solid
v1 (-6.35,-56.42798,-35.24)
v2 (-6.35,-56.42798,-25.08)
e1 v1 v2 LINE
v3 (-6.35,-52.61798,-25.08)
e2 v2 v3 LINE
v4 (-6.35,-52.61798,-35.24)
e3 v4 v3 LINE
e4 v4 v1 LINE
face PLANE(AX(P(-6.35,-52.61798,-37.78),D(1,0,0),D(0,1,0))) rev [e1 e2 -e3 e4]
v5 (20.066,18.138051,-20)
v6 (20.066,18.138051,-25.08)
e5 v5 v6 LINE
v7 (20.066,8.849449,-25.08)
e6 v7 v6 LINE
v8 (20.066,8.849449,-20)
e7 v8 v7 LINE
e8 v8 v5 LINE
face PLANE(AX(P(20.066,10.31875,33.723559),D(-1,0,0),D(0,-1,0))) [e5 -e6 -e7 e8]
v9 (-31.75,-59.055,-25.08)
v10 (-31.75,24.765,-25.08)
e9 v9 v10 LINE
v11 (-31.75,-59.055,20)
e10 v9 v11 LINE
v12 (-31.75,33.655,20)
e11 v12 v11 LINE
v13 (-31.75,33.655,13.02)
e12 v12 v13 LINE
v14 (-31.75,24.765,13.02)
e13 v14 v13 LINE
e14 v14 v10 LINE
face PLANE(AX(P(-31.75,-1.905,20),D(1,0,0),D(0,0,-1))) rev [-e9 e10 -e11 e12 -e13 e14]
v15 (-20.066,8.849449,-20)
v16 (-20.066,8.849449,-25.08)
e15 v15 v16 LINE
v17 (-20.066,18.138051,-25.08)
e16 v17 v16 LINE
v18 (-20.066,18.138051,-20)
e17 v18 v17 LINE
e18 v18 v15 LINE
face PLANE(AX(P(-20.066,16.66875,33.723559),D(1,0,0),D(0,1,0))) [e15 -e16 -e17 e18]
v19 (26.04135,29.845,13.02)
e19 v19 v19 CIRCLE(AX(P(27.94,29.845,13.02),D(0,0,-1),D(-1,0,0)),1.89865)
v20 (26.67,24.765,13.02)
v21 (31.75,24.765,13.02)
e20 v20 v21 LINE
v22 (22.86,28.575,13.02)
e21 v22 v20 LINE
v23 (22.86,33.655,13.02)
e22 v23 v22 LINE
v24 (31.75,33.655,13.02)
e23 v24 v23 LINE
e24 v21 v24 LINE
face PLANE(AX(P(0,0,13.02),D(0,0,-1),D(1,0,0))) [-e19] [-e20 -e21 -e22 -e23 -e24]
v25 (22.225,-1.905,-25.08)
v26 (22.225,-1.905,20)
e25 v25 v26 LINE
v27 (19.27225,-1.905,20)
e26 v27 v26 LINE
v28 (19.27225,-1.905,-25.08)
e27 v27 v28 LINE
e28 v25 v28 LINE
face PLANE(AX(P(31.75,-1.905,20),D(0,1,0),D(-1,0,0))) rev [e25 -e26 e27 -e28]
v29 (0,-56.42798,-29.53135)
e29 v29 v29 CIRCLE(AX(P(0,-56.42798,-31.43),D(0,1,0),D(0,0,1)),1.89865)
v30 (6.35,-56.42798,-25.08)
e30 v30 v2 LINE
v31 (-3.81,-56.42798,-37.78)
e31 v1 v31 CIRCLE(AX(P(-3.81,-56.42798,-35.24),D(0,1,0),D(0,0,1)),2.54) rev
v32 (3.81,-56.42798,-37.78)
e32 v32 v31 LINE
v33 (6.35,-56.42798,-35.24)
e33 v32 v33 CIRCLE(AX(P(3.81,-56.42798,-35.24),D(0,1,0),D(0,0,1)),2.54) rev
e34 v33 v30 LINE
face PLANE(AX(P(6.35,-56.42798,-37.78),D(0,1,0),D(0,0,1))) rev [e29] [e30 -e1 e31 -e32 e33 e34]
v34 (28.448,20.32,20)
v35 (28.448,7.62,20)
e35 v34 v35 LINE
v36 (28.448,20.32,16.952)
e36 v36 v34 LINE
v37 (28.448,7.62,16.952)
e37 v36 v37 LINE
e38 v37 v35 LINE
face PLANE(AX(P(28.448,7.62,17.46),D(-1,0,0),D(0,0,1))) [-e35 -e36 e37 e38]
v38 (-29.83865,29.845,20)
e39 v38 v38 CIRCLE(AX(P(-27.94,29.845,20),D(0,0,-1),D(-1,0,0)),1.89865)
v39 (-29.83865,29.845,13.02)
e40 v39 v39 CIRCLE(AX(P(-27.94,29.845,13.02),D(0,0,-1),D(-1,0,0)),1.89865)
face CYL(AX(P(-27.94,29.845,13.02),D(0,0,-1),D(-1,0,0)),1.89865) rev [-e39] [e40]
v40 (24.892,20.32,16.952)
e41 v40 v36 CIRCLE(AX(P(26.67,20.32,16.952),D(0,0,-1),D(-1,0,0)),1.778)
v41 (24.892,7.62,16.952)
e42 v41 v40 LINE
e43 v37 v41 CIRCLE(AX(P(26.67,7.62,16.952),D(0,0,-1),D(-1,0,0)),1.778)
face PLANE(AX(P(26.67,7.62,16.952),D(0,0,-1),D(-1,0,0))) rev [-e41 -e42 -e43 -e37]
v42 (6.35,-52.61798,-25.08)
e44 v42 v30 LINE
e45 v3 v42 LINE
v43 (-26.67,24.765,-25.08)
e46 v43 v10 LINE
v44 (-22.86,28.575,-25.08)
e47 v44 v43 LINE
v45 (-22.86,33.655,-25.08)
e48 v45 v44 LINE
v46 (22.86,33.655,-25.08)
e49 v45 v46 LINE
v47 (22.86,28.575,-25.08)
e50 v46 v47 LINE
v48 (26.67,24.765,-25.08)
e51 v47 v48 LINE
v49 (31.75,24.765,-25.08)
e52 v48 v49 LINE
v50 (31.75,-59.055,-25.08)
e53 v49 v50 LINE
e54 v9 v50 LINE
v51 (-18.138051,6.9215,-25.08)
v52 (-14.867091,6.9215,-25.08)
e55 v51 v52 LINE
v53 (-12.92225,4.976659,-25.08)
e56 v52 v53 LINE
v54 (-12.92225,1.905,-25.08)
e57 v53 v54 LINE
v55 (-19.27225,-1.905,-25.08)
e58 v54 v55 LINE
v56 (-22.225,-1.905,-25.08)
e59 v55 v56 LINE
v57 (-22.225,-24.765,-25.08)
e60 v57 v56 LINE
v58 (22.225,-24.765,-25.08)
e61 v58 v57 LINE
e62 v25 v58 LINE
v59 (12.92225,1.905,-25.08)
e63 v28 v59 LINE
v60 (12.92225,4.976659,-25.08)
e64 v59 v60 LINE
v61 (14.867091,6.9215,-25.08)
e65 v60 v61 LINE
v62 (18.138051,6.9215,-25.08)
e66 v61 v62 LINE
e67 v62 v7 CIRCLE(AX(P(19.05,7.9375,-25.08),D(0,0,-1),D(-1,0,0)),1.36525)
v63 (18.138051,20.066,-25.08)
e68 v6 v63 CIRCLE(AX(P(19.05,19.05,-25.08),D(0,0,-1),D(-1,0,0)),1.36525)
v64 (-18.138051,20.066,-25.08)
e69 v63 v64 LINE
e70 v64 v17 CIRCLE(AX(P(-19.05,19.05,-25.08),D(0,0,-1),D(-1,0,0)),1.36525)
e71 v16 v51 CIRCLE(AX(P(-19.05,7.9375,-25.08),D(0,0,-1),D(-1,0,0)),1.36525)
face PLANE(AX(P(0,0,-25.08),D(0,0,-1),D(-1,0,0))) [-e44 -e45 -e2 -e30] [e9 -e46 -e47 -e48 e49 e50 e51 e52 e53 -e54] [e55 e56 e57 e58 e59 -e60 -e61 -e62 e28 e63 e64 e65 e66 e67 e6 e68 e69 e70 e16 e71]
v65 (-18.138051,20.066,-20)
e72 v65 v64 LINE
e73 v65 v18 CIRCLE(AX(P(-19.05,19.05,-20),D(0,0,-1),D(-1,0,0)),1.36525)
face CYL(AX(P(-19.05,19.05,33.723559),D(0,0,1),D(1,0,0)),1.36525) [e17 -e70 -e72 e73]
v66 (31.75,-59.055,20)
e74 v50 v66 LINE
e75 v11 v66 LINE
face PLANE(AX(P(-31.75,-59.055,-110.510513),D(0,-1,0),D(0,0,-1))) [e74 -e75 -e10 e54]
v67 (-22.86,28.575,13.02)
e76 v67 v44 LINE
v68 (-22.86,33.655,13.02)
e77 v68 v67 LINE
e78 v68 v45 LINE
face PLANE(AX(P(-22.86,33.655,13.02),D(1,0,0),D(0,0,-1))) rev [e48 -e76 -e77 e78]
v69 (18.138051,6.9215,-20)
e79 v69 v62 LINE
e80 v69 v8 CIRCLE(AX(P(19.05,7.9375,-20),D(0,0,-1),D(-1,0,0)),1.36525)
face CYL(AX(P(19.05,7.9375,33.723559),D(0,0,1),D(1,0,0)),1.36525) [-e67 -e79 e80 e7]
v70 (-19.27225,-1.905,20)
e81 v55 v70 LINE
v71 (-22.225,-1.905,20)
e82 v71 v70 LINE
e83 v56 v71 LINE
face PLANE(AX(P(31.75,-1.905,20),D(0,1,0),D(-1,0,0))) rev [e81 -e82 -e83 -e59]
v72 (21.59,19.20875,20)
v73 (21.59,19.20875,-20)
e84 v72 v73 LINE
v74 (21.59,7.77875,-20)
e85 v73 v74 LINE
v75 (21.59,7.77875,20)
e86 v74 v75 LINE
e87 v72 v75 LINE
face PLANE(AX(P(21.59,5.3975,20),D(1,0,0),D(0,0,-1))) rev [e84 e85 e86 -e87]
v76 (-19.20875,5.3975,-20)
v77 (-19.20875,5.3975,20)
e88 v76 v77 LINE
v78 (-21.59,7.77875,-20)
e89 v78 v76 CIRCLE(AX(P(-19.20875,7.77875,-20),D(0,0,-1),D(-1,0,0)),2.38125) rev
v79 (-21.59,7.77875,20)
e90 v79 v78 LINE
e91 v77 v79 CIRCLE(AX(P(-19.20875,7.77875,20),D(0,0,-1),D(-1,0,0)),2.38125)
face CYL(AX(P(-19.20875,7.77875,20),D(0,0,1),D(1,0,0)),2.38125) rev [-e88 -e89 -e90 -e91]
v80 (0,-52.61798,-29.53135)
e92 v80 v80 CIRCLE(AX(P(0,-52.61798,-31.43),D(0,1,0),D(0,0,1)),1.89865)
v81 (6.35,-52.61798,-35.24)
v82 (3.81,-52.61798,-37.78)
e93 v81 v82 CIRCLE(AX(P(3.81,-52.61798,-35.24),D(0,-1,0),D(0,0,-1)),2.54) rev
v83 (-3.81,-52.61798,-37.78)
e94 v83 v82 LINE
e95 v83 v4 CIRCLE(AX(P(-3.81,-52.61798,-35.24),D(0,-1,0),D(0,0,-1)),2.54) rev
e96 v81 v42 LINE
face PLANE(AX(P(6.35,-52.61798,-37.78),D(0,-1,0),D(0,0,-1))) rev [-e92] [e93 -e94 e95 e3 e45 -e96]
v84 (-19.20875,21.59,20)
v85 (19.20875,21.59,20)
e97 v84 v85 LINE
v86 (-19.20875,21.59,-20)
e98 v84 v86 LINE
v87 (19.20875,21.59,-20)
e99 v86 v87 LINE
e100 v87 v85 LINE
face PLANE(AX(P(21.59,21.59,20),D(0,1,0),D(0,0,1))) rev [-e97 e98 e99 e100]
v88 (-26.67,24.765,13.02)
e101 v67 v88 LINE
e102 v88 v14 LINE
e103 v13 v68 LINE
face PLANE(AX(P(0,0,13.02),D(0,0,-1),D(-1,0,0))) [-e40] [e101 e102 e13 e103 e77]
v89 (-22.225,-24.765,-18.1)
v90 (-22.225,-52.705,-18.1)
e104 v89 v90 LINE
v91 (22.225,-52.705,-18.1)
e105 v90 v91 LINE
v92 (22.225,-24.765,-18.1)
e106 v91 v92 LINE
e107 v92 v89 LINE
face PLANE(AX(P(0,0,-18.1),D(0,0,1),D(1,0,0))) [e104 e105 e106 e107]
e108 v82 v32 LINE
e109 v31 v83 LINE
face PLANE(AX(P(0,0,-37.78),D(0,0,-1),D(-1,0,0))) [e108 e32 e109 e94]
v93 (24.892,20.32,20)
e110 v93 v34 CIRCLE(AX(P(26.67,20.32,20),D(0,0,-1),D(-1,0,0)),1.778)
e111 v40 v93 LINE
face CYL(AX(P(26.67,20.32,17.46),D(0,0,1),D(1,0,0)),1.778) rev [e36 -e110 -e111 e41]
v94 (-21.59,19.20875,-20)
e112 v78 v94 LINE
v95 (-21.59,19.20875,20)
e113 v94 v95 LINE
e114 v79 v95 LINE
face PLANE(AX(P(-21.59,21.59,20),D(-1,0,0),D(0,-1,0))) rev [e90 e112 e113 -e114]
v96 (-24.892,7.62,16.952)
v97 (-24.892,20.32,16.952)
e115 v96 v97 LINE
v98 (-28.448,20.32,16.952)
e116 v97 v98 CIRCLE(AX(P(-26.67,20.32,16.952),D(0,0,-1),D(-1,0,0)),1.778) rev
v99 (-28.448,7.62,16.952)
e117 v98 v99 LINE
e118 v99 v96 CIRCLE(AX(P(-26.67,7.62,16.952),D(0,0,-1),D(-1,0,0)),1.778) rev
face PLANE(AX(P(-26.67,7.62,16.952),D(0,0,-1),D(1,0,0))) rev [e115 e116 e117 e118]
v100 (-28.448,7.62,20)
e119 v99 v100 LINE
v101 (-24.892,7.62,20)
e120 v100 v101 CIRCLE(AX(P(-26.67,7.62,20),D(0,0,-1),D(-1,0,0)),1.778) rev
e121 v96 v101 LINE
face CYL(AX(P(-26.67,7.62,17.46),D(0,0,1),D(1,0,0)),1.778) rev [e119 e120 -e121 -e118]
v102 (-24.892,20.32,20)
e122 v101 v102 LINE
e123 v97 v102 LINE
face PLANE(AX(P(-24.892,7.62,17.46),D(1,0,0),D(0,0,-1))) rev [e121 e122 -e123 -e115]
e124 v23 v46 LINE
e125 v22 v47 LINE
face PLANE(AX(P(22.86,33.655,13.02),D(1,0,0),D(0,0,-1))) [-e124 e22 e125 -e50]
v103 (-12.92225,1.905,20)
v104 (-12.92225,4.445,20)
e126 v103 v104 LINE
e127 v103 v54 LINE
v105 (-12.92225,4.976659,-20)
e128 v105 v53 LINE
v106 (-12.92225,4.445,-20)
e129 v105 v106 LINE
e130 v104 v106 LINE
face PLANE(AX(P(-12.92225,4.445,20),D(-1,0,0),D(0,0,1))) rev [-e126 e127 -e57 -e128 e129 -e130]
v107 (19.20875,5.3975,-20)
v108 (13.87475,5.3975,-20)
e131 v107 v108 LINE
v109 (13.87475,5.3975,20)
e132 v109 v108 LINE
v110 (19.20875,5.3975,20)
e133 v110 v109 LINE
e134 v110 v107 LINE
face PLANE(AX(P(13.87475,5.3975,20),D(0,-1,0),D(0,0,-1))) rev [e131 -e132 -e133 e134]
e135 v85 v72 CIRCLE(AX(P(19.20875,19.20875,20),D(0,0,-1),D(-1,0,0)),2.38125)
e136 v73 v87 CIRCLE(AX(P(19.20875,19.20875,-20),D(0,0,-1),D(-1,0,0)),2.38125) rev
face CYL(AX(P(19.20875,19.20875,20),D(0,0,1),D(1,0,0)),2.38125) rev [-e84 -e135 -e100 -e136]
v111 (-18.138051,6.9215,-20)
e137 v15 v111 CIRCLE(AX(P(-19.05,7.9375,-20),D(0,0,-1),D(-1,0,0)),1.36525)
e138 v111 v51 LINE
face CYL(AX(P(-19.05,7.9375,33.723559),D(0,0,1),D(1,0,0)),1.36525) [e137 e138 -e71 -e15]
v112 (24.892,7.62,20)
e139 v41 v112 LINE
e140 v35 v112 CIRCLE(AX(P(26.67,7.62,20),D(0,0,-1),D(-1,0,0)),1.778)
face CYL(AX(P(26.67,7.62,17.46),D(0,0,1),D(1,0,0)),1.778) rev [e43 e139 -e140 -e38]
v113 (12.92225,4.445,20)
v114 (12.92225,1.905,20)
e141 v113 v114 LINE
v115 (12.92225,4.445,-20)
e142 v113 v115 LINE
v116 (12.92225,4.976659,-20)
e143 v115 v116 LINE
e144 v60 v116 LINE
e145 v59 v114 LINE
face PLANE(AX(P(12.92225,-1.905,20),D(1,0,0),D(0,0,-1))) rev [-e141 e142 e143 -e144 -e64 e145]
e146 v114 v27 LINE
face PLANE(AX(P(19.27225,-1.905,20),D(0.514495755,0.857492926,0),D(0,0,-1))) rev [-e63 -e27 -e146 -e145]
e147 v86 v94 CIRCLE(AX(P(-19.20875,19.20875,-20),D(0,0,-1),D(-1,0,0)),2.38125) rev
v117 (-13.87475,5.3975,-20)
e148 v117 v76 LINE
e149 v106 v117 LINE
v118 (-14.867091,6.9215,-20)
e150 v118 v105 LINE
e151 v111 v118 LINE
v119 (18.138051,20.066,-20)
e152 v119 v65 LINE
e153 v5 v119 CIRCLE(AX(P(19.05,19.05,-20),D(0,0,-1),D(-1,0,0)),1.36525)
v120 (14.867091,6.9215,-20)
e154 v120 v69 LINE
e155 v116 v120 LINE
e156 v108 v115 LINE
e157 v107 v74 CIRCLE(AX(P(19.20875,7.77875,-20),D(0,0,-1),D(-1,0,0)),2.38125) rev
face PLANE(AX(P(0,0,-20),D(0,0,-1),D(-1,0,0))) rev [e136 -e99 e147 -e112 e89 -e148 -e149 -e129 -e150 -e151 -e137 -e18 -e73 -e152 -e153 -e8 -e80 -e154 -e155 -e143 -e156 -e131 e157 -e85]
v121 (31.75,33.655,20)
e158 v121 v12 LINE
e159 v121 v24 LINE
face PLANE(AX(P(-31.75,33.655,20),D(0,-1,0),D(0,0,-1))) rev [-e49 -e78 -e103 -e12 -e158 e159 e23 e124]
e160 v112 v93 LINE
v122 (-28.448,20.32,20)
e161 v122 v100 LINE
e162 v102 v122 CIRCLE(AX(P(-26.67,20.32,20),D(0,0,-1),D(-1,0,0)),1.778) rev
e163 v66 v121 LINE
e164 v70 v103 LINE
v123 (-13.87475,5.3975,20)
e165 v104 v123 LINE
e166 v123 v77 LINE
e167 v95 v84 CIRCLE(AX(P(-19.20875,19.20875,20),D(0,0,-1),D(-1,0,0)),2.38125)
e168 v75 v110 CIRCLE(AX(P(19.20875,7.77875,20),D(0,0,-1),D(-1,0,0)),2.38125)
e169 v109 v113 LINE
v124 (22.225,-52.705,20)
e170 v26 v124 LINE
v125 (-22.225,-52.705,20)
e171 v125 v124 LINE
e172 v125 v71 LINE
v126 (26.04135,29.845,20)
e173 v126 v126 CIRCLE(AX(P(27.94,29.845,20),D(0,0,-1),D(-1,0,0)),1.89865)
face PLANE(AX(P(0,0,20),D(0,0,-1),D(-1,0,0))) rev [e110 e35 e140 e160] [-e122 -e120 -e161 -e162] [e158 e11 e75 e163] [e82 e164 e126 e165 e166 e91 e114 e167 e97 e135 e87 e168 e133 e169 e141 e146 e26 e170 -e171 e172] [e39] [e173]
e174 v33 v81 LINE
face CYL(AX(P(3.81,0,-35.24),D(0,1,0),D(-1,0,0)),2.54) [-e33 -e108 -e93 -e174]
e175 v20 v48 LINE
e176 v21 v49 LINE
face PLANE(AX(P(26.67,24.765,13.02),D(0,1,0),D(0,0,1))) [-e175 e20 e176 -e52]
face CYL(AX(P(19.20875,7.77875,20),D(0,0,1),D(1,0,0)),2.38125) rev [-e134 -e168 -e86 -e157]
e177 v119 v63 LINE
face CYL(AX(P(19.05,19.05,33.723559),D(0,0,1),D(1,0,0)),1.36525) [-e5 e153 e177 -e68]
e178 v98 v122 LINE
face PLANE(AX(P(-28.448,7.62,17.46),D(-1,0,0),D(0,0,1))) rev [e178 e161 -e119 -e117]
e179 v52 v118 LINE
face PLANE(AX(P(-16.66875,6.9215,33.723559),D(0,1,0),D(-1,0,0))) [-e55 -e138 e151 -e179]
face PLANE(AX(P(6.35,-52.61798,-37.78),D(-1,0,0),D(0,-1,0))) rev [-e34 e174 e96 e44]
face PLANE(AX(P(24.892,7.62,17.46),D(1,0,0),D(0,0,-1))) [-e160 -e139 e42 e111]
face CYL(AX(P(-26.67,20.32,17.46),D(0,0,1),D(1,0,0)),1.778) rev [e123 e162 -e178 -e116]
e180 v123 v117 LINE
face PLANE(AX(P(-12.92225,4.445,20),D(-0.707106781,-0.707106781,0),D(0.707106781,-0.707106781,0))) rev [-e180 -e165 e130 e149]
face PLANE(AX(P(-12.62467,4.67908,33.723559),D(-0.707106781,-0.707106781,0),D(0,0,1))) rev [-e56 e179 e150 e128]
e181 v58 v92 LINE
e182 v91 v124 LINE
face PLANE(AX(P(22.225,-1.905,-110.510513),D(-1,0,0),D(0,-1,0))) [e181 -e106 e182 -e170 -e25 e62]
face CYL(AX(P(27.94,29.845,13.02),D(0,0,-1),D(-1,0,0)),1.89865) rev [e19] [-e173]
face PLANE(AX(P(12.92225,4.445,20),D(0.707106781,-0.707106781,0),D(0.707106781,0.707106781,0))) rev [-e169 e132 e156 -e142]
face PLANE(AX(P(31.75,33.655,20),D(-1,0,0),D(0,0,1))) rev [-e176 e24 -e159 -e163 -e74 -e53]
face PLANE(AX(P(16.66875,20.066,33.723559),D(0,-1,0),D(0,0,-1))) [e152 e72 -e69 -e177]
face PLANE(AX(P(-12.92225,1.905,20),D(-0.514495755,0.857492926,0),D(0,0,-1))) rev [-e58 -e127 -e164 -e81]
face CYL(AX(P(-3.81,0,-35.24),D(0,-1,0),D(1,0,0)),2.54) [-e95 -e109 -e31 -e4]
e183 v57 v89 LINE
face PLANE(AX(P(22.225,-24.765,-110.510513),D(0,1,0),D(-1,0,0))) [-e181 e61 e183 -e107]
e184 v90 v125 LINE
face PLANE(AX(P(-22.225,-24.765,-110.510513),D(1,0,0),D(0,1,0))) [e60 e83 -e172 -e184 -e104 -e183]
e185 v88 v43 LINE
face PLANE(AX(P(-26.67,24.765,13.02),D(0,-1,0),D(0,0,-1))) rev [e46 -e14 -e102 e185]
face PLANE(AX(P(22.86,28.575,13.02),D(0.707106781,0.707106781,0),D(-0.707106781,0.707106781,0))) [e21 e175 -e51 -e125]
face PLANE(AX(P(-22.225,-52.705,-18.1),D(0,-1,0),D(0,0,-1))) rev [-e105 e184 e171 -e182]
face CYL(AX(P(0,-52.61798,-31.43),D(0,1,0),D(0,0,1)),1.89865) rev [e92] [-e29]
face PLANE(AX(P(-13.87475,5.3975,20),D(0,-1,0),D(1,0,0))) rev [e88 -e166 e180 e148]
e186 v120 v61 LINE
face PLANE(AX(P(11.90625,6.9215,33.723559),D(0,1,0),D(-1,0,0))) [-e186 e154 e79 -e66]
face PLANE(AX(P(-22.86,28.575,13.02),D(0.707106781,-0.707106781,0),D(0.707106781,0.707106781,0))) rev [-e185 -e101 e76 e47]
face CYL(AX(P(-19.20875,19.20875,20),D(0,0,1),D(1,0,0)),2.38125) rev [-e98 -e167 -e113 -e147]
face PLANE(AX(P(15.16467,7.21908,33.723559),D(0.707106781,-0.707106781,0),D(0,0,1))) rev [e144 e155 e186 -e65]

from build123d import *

# Parameters (mm, degrees)
BOSS_EXTRU_1_DEPTH      = 20
CONG_1_R                = 2.38125
ESQUISSE2_W             = 63.5
ESQUISSE2_H             = 35.56
BOSS_EXTRU_2_DEPTH      = 5.08
EMPREINTE1_START        = -25.08
EMPREINTE1_DEPTH        = 5.08
D_PLACER_START          = -25.08
D_PLACER_LA_FACE1_DEPTH = 5.08
EMPREINTE4_START        = 17.46
EMPREINTE4_DEPTH        = 2.54
D_PLACER_START_2        = 16.952
D_PLACER_LA_FACE2_DEPTH = 3.048
CHANFREIN1_SIZE         = 6.35
CHANFREIN1_SIZE2        = 3.81
CHANFREIN2_SIZE         = 3.81
CHANFREIN2_SIZE2        = 6.35
BOSS_EXTRU_3_DEPTH      = 45.08
ESQUISSE4_W             = 44.45
ESQUISSE4_H             = 27.94
ENL_V_MAT_EXTRU_1_DEPTH = 38.1
ESQUISSE5_W             = 12.7
ESQUISSE5_H             = 3.81
BOSS_EXTRU_4_DEPTH      = 12.7
CONG_2_R                = 2.54
D_GAGEMENT_61_D         = 3.7973
ENL_V_MAT_EXTRU_2_DEPTH = 38.1
D_GAGEMENT_62_D         = 3.7973
D_GAGEMENT_62_DEPTH     = 18.796
D_GAGEMENT_62_TIP       = 1.140824014


# Read off the part's stored shape, not the designer's step: Empreinte1, Déplacer la face1, Empreinte4, Déplacer la face2
with BuildPart() as part:
    # Esquisse1 → Boss.-Extru.1 (new, symmetric)
    with BuildSketch(Plane.XY):
        Polygon((-31.75, -1.905), (-31.75, 33.655), (31.75, 33.655), (31.75, -1.905), (12.92225, -1.905), (12.92225, 4.445), (13.87475, 5.3975), (21.59, 5.3975), (21.59, 21.59), (-21.59, 21.59), (-21.59, 5.3975), (-13.87475, 5.3975), (-12.92225, 4.445), (-12.92225, -1.905), align=None)
    extrude(amount=BOSS_EXTRU_1_DEPTH, both=True)

    # Congé1
    cong_1_edges = [part.edges().sort_by_distance(p)[0] for p in [
        (21.59, 5.3975, 0),
        (21.59, 21.59, 0),
        (-21.59, 21.59, 0),
        (-21.59, 5.3975, 0),
    ]]
    fillet(cong_1_edges, radius=CONG_1_R)

    # Esquisse2 → Boss.-Extru.2 (add)
    with BuildSketch(Plane(origin=(0, 0, -20), x_dir=(-1, 0, 0), z_dir=(0, 0, -1))):
        with Locations((0, 15.875)):
            Rectangle(ESQUISSE2_W, ESQUISSE2_H)
    extrude(amount=BOSS_EXTRU_2_DEPTH)

    # Empreinte1 outline → Empreinte1 (cut)
    with BuildSketch(Plane.XY.offset(EMPREINTE1_START)):
        with BuildLine():
            Line((14.44625, 7.9375), (16.66875, 7.9375))
            ThreePointArc((16.66875, 7.9375), (17.366201977, 9.621298023), (19.05, 10.31875))
            Line((19.05, 10.31875), (19.05, 16.66875))
            ThreePointArc((19.05, 16.66875), (17.366201977, 17.366201977), (16.66875, 19.05))
            Line((16.66875, 19.05), (-16.66875, 19.05))
            ThreePointArc((-16.66875, 19.05), (-17.366201977, 17.366201977), (-19.05, 16.66875))
            Line((-19.05, 16.66875), (-19.05, 10.31875))
            ThreePointArc((-19.05, 10.31875), (-17.366201977, 9.621298023), (-16.66875, 7.9375))
            Line((-16.66875, 7.9375), (-14.44625, 7.9375))
            Line((-14.44625, 7.9375), (-11.90625, 5.3975))
            Line((-11.90625, 5.3975), (-11.90625, -1.905))
            Line((-11.90625, -1.905), (11.90625, -1.905))
            Line((11.90625, -1.905), (11.90625, 5.3975))
            Line((11.90625, 5.3975), (14.44625, 7.9375))
        make_face()
    extrude(amount=EMPREINTE1_DEPTH, mode=Mode.SUBTRACT)

    # Déplacer la face1 outline → Déplacer la face1 (cut)
    with BuildSketch(Plane.XY.offset(D_PLACER_START)):
        with BuildLine():
            Line((-14.867090979, 6.9215), (-12.92225, 4.976659021))
            Line((-12.92225, 4.976659021), (-12.92225, -1.905))
            Line((-12.92225, -1.905), (-11.90625, -1.905))
            Line((-11.90625, -1.905), (-11.90625, 5.3975))
            Line((-11.90625, 5.3975), (-14.44625, 7.9375))
            Line((-14.44625, 7.9375), (-16.66875, 7.9375))
            ThreePointArc((-16.66875, 7.9375), (-17.366201977, 9.621298023), (-19.05, 10.31875))
            Line((-19.05, 10.31875), (-19.05, 16.66875))
            ThreePointArc((-19.05, 16.66875), (-17.366201977, 17.366201977), (-16.66875, 19.05))
            Line((-16.66875, 19.05), (16.66875, 19.05))
            ThreePointArc((16.66875, 19.05), (17.366201977, 17.366201977), (19.05, 16.66875))
            Line((19.05, 16.66875), (19.05, 10.31875))
            ThreePointArc((19.05, 10.31875), (17.366201977, 9.621298023), (16.66875, 7.9375))
            Line((16.66875, 7.9375), (14.44625, 7.9375))
            Line((14.44625, 7.9375), (11.90625, 5.3975))
            Line((11.90625, 5.3975), (11.90625, -1.905))
            Line((11.90625, -1.905), (12.92225, -1.905))
            Line((12.92225, -1.905), (12.92225, 4.976659021))
            Line((12.92225, 4.976659021), (14.867090979, 6.9215))
            Line((14.867090979, 6.9215), (18.13805068, 6.9215))
            ThreePointArc((18.13805068, 6.9215), (18.084622467, 8.902877533), (20.066, 8.84944932))
            Line((20.066, 8.84944932), (20.066, 18.13805068))
            ThreePointArc((20.066, 18.13805068), (18.084622467, 18.084622467), (18.13805068, 20.066))
            Line((18.13805068, 20.066), (-18.13805068, 20.066))
            ThreePointArc((-18.13805068, 20.066), (-18.084622467, 18.084622467), (-20.066, 18.13805068))
            Line((-20.066, 18.13805068), (-20.066, 8.84944932))
            ThreePointArc((-20.066, 8.84944932), (-18.084622467, 8.902877533), (-18.13805068, 6.9215))
            Line((-18.13805068, 6.9215), (-14.867090979, 6.9215))
        make_face()
    extrude(amount=D_PLACER_LA_FACE1_DEPTH, mode=Mode.SUBTRACT)

    # Empreinte4 outline → Empreinte4 (cut)
    with BuildSketch(Plane.XY.offset(EMPREINTE4_START)):
        with BuildLine():
            ThreePointArc((-27.94, 7.62), (-26.67, 6.35), (-25.4, 7.62))
            Line((-25.4, 7.62), (-25.4, 20.32))
            ThreePointArc((-25.4, 20.32), (-26.67, 21.59), (-27.94, 20.32))
            Line((-27.94, 20.32), (-27.94, 7.62))
        make_face()
        with BuildLine():
            Line((25.4, 20.32), (25.4, 7.62))
            ThreePointArc((25.4, 7.62), (26.67, 6.35), (27.94, 7.62))
            Line((27.94, 7.62), (27.94, 20.32))
            ThreePointArc((27.94, 20.32), (26.67, 21.59), (25.4, 20.32))
        make_face()
    extrude(amount=EMPREINTE4_DEPTH, mode=Mode.SUBTRACT)

    # Déplacer la face2 outline → Déplacer la face2 (cut)
    with BuildSketch(Plane.XY.offset(D_PLACER_START_2)):
        with BuildLine():
            ThreePointArc((-28.448, 7.62), (-26.67, 5.842), (-24.892, 7.62))
            Line((-24.892, 7.62), (-24.892, 20.32))
            ThreePointArc((-24.892, 20.32), (-26.67, 22.098), (-28.448, 20.32))
            Line((-28.448, 20.32), (-28.448, 7.62))
        make_face()
        with BuildLine():
            Line((24.892, 20.32), (24.892, 7.62))
            ThreePointArc((24.892, 7.62), (26.67, 5.842), (28.448, 7.62))
            Line((28.448, 7.62), (28.448, 20.32))
            ThreePointArc((28.448, 20.32), (26.67, 22.098), (24.892, 20.32))
        make_face()
    extrude(amount=D_PLACER_LA_FACE2_DEPTH, mode=Mode.SUBTRACT)

    # Chanfrein1
    chanfrein1_edges = [part.edges().sort_by_distance(p)[0] for p in [
        (-12.92225, -1.905, -2.54),
    ]]
    chanfrein1_side = [part.faces().sort_by_distance(p)[0] for p in [
        (-22.336125, -1.905, -2.54),
    ]]
    chamfer(chanfrein1_edges, length=CHANFREIN1_SIZE, length2=CHANFREIN1_SIZE2, reference=chanfrein1_side[0])

    # Chanfrein2
    chanfrein2_edges = [part.edges().sort_by_distance(p)[0] for p in [
        (12.92225, -1.905, -2.54),
    ]]
    chanfrein2_side = [part.faces().sort_by_distance(p)[0] for p in [
        (12.92225, 1.302160596, -2.726935132),
    ]]
    chamfer(chanfrein2_edges, length=CHANFREIN2_SIZE, length2=CHANFREIN2_SIZE2, reference=chanfrein2_side[0])

    # Esquisse3 → Boss.-Extru.3 (add)
    with BuildSketch(Plane.XY.offset(20)):
        Polygon((-31.75, -1.905), (-31.75, -59.055), (31.75, -59.055), (31.75, -1.905), (22.225, -1.905), (22.225, -24.765), (-22.225, -24.765), (-22.225, -1.905), align=None)
    extrude(amount=-BOSS_EXTRU_3_DEPTH)

    # Esquisse4 → Enlèv. mat.-Extru.1 (cut)
    with BuildSketch(Plane.XY.offset(20)):
        with Locations((0, -38.735)):
            Rectangle(ESQUISSE4_W, ESQUISSE4_H)
    extrude(amount=-ENL_V_MAT_EXTRU_1_DEPTH, mode=Mode.SUBTRACT)

    # Esquisse5 → Boss.-Extru.4 (add)
    with BuildSketch(Plane(origin=(0, 0, -25.08), x_dir=(-1, 0, 0), z_dir=(0, 0, -1))):
        with Locations((0, -54.522979854)):
            Rectangle(ESQUISSE5_W, ESQUISSE5_H)
    extrude(amount=BOSS_EXTRU_4_DEPTH)

    # Congé2
    cong_2_edges = [part.edges().sort_by_distance(p)[0] for p in [
        (6.35, -54.522979854, -37.78),
        (-6.35, -54.522979854, -37.78),
    ]]
    fillet(cong_2_edges, radius=CONG_2_R)

    # Dégagement #61 (through all)
    with Locations(Plane(origin=(0, -52.617979854, 0), x_dir=(1, 0, 0), z_dir=(0, 1, 0))):
        with Locations((0, 31.43)):
            Hole(D_GAGEMENT_61_D / 2)

    # Esquisse8 → Enlèv. mat.-Extru.2 (cut)
    with BuildSketch(Plane(origin=(0, 0, -25.08), x_dir=(-1, 0, 0), z_dir=(0, 0, -1))):
        Polygon((22.86, 33.655), (31.75, 33.655), (31.75, 24.765), (26.67, 24.765), (22.86, 28.575), align=None)
    enl_v_mat_extru_2 = extrude(amount=-ENL_V_MAT_EXTRU_2_DEPTH, mode=Mode.SUBTRACT)

    # Symétrie1: Enlèv. mat.-Extru.2 across plane
    add(enl_v_mat_extru_2.mirror(Plane(origin=(0, 0, 0), x_dir=(0, 0, 1), z_dir=(1, 0, 0))), mode=Mode.SUBTRACT)

    # Dégagement #62
    with Locations(Plane(origin=(0, 0, 13.02), x_dir=(-1, 0, 0), z_dir=(0, 0, -1))):
        with Locations((27.94, 29.845), (-27.94, 29.845)):
            Hole(D_GAGEMENT_62_D / 2, depth=D_GAGEMENT_62_DEPTH)
            with Locations((0, 0, -(D_GAGEMENT_62_DEPTH + D_GAGEMENT_62_TIP / 2))):  # 118° drill point
                Cone(0, D_GAGEMENT_62_D / 2, D_GAGEMENT_62_TIP, mode=Mode.SUBTRACT)


solid = part.part
